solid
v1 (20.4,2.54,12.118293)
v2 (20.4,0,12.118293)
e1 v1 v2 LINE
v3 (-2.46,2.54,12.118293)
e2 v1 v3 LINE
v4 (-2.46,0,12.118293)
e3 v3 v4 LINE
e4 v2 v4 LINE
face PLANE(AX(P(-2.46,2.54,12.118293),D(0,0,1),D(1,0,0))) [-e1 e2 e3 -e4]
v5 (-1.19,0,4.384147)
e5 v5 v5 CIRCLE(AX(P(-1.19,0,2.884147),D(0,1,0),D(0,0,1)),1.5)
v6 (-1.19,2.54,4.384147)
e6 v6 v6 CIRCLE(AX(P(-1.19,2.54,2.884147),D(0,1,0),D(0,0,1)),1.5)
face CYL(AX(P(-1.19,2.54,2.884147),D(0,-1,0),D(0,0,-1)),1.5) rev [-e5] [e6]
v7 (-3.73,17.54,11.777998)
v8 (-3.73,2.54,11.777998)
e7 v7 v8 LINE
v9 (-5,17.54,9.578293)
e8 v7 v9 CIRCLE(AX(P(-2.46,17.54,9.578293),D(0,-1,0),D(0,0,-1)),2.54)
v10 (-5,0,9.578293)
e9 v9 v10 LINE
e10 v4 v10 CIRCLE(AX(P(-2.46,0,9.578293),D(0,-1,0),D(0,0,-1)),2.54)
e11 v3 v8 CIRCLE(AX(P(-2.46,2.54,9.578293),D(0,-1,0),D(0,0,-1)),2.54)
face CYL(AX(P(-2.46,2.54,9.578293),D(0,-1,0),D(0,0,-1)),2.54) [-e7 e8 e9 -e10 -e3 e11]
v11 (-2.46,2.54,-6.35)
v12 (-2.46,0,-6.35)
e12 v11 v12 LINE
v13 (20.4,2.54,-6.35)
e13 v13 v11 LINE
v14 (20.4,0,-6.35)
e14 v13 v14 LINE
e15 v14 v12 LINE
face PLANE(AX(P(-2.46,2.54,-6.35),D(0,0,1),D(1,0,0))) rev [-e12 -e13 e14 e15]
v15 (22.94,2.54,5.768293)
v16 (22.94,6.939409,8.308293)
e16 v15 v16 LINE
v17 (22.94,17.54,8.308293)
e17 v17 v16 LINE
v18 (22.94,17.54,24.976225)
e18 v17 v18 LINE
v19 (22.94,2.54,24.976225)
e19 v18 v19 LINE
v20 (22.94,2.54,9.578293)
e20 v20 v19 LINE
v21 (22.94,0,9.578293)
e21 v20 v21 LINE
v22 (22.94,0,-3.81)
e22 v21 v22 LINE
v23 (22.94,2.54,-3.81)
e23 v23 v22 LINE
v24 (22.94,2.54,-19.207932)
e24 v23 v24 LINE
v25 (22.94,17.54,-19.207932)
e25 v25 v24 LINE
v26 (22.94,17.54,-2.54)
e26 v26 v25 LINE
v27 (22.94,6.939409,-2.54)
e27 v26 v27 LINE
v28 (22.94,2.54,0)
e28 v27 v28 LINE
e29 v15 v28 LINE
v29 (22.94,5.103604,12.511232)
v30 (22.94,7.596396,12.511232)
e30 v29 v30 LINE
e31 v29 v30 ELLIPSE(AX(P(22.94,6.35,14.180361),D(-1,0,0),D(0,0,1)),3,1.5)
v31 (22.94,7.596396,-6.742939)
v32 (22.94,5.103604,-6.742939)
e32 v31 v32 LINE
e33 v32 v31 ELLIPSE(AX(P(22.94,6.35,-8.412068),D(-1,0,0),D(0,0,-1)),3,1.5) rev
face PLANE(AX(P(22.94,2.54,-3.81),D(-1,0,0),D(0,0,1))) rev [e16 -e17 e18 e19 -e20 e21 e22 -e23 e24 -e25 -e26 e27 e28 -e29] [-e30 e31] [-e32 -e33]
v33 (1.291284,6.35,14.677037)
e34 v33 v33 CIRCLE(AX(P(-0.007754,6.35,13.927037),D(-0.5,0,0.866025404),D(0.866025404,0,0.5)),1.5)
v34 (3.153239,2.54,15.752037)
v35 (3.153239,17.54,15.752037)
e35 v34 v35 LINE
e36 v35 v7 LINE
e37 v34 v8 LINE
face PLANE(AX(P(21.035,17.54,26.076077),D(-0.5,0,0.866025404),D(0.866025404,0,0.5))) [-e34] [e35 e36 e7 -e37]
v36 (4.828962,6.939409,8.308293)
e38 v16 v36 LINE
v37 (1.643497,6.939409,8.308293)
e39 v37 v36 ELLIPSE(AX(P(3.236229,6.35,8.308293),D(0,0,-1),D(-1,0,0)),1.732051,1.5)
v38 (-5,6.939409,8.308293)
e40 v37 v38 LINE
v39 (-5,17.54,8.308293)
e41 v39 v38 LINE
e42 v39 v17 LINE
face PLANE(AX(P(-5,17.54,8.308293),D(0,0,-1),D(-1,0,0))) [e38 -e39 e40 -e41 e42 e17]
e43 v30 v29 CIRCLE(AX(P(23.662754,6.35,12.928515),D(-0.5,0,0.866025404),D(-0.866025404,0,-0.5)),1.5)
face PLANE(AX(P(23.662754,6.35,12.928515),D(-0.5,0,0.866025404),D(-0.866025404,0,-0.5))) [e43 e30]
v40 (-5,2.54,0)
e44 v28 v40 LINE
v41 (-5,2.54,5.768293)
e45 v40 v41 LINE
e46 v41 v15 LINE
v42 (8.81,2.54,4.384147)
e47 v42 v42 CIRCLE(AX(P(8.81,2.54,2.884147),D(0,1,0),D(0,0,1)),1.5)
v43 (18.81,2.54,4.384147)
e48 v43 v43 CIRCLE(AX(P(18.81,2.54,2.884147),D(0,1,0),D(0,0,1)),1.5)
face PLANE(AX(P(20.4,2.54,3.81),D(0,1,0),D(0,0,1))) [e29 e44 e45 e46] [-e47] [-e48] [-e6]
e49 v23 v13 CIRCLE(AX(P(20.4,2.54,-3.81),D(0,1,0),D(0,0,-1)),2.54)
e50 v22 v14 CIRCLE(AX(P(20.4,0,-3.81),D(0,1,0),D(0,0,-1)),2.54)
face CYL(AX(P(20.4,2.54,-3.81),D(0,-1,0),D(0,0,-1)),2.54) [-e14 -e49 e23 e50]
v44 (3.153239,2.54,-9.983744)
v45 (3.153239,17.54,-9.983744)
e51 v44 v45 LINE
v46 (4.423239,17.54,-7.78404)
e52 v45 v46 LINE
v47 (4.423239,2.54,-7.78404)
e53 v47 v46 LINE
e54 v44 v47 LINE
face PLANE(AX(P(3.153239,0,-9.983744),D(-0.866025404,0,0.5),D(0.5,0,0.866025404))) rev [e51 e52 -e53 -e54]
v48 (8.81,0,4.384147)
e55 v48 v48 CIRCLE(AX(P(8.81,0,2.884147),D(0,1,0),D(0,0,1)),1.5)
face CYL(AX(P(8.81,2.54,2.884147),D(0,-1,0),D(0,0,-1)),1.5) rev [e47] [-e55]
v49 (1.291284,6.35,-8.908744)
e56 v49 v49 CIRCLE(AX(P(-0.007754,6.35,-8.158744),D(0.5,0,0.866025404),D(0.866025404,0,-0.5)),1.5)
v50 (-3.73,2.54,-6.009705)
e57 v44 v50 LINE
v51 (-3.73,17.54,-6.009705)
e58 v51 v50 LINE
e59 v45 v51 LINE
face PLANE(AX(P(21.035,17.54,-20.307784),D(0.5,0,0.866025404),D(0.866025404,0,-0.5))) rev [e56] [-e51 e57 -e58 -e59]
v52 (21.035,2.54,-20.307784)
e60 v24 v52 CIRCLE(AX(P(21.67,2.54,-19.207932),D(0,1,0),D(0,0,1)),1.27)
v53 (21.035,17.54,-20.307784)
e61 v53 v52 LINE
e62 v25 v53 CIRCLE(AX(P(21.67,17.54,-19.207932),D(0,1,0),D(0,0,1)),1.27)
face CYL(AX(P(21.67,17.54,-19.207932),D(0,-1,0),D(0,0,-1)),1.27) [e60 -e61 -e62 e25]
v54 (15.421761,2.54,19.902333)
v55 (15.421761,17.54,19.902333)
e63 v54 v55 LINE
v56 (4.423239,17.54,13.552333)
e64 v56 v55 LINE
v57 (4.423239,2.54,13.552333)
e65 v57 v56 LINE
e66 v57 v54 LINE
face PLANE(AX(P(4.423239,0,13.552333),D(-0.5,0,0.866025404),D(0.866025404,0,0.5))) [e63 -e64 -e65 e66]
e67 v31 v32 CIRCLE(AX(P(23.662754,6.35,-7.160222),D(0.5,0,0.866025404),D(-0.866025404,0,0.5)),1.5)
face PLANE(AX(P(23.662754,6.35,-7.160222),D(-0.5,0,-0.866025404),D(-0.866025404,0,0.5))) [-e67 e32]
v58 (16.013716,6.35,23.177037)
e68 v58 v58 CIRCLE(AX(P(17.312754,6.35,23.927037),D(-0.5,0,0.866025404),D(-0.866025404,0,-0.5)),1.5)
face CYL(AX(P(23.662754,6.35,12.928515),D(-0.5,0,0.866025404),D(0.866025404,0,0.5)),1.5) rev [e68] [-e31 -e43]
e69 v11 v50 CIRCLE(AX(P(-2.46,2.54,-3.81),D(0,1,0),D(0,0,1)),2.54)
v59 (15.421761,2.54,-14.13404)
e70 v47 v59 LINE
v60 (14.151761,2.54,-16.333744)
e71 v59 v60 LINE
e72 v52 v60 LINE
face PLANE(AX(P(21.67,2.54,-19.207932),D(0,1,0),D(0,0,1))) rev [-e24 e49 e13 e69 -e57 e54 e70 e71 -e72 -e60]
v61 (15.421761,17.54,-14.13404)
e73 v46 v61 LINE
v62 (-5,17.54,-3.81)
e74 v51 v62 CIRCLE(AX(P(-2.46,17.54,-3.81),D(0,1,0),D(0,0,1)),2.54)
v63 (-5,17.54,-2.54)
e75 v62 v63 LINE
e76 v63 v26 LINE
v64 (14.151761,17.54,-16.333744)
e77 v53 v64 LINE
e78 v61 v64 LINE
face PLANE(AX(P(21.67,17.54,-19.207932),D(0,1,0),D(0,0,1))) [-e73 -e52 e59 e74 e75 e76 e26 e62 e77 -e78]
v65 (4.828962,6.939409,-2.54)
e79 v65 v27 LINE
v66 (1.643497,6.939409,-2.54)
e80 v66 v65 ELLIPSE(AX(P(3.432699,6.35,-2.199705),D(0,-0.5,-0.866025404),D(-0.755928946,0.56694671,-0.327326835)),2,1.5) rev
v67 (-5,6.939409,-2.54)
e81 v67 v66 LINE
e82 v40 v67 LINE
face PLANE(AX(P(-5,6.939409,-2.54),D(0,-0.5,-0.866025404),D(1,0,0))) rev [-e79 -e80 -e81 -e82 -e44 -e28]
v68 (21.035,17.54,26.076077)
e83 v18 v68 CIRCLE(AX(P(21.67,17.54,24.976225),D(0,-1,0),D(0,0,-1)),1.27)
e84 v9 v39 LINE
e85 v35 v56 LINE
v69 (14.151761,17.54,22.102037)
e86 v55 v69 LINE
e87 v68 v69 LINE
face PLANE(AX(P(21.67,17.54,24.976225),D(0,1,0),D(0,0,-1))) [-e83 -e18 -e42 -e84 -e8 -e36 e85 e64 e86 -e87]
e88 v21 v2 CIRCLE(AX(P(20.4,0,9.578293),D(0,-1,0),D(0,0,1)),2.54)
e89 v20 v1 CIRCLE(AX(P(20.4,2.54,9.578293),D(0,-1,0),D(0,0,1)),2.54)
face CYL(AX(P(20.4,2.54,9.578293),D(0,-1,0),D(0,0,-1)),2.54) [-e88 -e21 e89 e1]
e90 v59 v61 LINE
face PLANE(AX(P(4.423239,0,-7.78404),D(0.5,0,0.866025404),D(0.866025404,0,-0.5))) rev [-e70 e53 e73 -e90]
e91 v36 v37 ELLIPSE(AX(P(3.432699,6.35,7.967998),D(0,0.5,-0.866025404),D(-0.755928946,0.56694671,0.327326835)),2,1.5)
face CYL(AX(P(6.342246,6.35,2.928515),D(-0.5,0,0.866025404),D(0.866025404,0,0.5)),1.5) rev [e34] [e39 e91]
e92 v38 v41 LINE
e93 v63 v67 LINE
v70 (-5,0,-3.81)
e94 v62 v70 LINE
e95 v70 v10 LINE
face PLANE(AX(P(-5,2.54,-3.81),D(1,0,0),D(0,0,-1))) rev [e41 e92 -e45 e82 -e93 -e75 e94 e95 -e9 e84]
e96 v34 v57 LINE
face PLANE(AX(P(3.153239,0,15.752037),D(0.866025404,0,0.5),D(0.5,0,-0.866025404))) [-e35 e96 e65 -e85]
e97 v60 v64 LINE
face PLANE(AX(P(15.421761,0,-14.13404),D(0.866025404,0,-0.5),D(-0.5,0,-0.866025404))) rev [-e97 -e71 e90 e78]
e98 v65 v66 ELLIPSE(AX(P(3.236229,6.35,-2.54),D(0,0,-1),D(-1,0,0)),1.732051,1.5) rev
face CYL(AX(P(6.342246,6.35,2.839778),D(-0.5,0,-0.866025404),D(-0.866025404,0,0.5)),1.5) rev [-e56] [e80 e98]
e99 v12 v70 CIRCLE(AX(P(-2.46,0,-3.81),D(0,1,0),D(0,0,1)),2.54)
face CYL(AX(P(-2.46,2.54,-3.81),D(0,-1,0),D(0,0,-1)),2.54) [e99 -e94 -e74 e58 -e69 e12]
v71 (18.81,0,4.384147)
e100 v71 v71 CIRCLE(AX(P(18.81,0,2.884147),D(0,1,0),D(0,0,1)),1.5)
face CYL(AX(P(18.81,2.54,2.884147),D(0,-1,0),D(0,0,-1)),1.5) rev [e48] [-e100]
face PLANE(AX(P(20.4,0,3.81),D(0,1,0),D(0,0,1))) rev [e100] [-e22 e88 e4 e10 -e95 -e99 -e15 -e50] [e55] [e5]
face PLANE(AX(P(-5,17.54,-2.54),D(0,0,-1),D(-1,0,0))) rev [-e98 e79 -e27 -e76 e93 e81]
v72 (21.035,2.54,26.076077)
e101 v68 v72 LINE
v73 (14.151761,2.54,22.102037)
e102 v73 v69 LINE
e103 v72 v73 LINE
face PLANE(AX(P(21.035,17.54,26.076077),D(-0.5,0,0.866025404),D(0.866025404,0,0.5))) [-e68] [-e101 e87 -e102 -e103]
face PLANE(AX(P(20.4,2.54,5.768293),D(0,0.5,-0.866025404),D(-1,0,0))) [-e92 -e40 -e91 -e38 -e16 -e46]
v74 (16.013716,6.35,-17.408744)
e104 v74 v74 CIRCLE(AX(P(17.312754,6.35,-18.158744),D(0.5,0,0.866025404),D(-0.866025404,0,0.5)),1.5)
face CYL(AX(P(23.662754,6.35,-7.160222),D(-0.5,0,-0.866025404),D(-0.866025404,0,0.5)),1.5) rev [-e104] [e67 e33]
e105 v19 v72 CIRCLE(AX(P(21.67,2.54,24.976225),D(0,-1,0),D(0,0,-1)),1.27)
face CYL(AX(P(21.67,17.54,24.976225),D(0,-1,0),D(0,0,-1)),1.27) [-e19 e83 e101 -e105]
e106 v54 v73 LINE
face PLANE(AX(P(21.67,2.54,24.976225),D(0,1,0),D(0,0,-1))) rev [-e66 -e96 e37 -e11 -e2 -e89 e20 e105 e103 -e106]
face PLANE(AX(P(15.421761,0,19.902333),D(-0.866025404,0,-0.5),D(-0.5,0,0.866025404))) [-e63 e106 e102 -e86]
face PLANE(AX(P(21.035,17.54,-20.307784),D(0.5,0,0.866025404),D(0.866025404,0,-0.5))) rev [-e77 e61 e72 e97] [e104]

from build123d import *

# Parameters (mm, degrees)
SKETCH1_R                  = 1.5
BOSS_EXTRUDE1_DEPTH        = 2.54
BOSS_EXTRUDE3_DEPTH        = 15
SKETCH5_R                  = 1.5
CUT_EXTRUDE1_DEPTH         = 12.7
CHAMFER1_SIZE              = 2.54
CHAMFER1_SIZE_2            = 4.399409051
CUT_EXTRUDE5_DEPTH         = 36.401142437
CHAMFER1_OF_MIRROR1_SIZE   = 4.399409051
CHAMFER1_OF_MIRROR1_SIZE_2 = 2.54


with BuildPart() as part:
    # Sketch1 → Boss-Extrude1 (new body)
    with BuildSketch(Plane(origin=(0, 0, 0), x_dir=(1, 0, 0), z_dir=(0, 1, 0))):
        with BuildLine():
            Line((-2.46, 6.35), (20.4, 6.35))
            ThreePointArc((20.4, 6.35), (22.196051224, 5.606051224), (22.94, 3.81))
            Line((22.94, 3.81), (22.94, -3.81))
            ThreePointArc((22.94, -3.81), (22.196051224, -5.606051224), (20.4, -6.35))
            Line((20.4, -6.35), (-2.46, -6.35))
            ThreePointArc((-2.46, -6.35), (-4.256051224, -5.606051224), (-5, -3.81))
            Line((-5, -3.81), (-5, 3.81))
            ThreePointArc((-5, 3.81), (-4.256051224, 5.606051224), (-2.46, 6.35))
        make_face()
        with Locations(Location((-1.19, -2.88414655, 0), (0, 0, 270))):
            Circle(SKETCH1_R, mode=Mode.SUBTRACT)
        with Locations(Location((8.81, -2.88414655, 0), (0, 0, 270))):
            Circle(SKETCH1_R, mode=Mode.SUBTRACT)
        with Locations(Location((18.81, -2.88414655, 0), (0, 0, 270))):
            Circle(SKETCH1_R, mode=Mode.SUBTRACT)
    boss_extrude1 = extrude(amount=BOSS_EXTRUDE1_DEPTH)

    # Sketch3 → Boss-Extrude3 (add)
    with BuildSketch(Plane(origin=(0, 2.54, 0), x_dir=(1, 0, 0), z_dir=(0, 1, 0))):
        with BuildLine():
            Line((-5, 2.54), (22.94, 2.54))
            Line((22.94, 2.54), (22.94, 3.81))
            Line((22.94, 3.81), (22.94, 19.207931679))
            ThreePointArc((22.94, 19.207931679), (22.305, 20.307783942), (21.035, 20.307783942))
            Line((21.035, 20.307783942), (-3.73, 6.009704526))
            ThreePointArc((-3.73, 6.009704526), (-4.659704526, 5.08), (-5, 3.81))
            Line((-5, 3.81), (-5, 2.54))
        make_face()
    boss_extrude3 = extrude(amount=BOSS_EXTRUDE3_DEPTH)

    # Sketch5 → Cut-Extrude1 (cut)
    with BuildSketch(Plane(origin=(-5.860422493, 0, -4.779704526), x_dir=(0.8660254037844379, 0, -0.5000000000000014), z_dir=(0.5000000000000013, 0, 0.8660254037844378))):
        with Locations(Location((6.758079416, 6.35, 0), (0, 0, 180))):
            Circle(SKETCH5_R)
        with Locations(Location((26.758079416, 6.35, 0), (0, 0, 180))):
            Circle(SKETCH5_R)
    cut_extrude1 = extrude(amount=CUT_EXTRUDE1_DEPTH, mode=Mode.SUBTRACT)

    # Chamfer1
    # the kernel refuses this chamfer: 4.399409051, 2.54 mm, written as the material it adds along each edge
    with BuildSketch(Plane(origin=(-5, 2.54, -2.54), x_dir=(0, -0.057893862402671366, 0.9983227437537925), z_dir=(1, 0, 0))) as chamfer1_piece_1_section:
        Polygon((CHAMFER1_SIZE * 0.998322743754, -CHAMFER1_SIZE * 0.0578938624027), (-CHAMFER1_SIZE_2 * 0.0578938624056, -CHAMFER1_SIZE_2 * 0.998322743805), (0, 0), align=None)
    chamfer1_piece_1 = extrude(amount=27.94, mode=Mode.PRIVATE)
    chamfer1_piece_1 = chamfer1_piece_1 - Plane(origin=(5.060500306, 6.35, 0.619729795), x_dir=(-0.8660254037844379, 0, 0.5000000000000014), z_dir=(-0.5000000000000014, 0, -0.8660254037844379)) * Cylinder(1.5, 74, mode=Mode.PRIVATE)
    add(chamfer1_piece_1)

    # Sketch11 → Cut-Extrude5 (cut, symmetric)
    with BuildSketch(Plane(origin=(0, 17.54, 0), x_dir=(1, 0, 0), z_dir=(0, 1, 0))):
        Polygon((3.153238686, 9.983744234), (4.423238686, 7.784039708), (15.421761314, 14.134039708), (14.151761314, 16.333744234), align=None)
    cut_extrude5 = extrude(amount=CUT_EXTRUDE5_DEPTH, both=True, mode=Mode.SUBTRACT)

    # Mirror1: Boss-Extrude1, Boss-Extrude3, Cut-Extrude1, Cut-Extrude5 across plane
    add(boss_extrude1.mirror(Plane.XY.offset(2.88414655)))
    add(boss_extrude3.mirror(Plane.XY.offset(2.88414655)))
    add(cut_extrude1.mirror(Plane.XY.offset(2.88414655)), mode=Mode.SUBTRACT)
    add(cut_extrude5.mirror(Plane.XY.offset(2.88414655)), mode=Mode.SUBTRACT)

    # Chamfer1 of Mirror1
    # the kernel refuses this chamfer: 4.399409051, 2.54 mm, written as the material it adds along each edge
    with BuildSketch(Plane(origin=(-5, 2.54, 8.308293101), x_dir=(0, 0.9998132206222079, 0.019326765612700737), z_dir=(1, 0, 0))) as chamfer1_of_mirror1_piece_1_section:
        Polygon((CHAMFER1_OF_MIRROR1_SIZE * 0.999813220673, -CHAMFER1_OF_MIRROR1_SIZE * 0.0193267656137), (-CHAMFER1_OF_MIRROR1_SIZE_2 * 0.0193267656127, -CHAMFER1_OF_MIRROR1_SIZE_2 * 0.999813220622), (0, 0), align=None)
    chamfer1_of_mirror1_piece_1 = extrude(amount=27.94, mode=Mode.PRIVATE)
    chamfer1_of_mirror1_piece_1 = chamfer1_of_mirror1_piece_1 - Plane(origin=(5.060500238, 6.35, 5.148563423), x_dir=(-0.8660254037844379, 0, -0.5000000000000014), z_dir=(-0.5000000000000014, 0, 0.8660254037844379)) * Cylinder(1.5, 74, mode=Mode.PRIVATE)
    add(chamfer1_of_mirror1_piece_1)


solid = part.part
